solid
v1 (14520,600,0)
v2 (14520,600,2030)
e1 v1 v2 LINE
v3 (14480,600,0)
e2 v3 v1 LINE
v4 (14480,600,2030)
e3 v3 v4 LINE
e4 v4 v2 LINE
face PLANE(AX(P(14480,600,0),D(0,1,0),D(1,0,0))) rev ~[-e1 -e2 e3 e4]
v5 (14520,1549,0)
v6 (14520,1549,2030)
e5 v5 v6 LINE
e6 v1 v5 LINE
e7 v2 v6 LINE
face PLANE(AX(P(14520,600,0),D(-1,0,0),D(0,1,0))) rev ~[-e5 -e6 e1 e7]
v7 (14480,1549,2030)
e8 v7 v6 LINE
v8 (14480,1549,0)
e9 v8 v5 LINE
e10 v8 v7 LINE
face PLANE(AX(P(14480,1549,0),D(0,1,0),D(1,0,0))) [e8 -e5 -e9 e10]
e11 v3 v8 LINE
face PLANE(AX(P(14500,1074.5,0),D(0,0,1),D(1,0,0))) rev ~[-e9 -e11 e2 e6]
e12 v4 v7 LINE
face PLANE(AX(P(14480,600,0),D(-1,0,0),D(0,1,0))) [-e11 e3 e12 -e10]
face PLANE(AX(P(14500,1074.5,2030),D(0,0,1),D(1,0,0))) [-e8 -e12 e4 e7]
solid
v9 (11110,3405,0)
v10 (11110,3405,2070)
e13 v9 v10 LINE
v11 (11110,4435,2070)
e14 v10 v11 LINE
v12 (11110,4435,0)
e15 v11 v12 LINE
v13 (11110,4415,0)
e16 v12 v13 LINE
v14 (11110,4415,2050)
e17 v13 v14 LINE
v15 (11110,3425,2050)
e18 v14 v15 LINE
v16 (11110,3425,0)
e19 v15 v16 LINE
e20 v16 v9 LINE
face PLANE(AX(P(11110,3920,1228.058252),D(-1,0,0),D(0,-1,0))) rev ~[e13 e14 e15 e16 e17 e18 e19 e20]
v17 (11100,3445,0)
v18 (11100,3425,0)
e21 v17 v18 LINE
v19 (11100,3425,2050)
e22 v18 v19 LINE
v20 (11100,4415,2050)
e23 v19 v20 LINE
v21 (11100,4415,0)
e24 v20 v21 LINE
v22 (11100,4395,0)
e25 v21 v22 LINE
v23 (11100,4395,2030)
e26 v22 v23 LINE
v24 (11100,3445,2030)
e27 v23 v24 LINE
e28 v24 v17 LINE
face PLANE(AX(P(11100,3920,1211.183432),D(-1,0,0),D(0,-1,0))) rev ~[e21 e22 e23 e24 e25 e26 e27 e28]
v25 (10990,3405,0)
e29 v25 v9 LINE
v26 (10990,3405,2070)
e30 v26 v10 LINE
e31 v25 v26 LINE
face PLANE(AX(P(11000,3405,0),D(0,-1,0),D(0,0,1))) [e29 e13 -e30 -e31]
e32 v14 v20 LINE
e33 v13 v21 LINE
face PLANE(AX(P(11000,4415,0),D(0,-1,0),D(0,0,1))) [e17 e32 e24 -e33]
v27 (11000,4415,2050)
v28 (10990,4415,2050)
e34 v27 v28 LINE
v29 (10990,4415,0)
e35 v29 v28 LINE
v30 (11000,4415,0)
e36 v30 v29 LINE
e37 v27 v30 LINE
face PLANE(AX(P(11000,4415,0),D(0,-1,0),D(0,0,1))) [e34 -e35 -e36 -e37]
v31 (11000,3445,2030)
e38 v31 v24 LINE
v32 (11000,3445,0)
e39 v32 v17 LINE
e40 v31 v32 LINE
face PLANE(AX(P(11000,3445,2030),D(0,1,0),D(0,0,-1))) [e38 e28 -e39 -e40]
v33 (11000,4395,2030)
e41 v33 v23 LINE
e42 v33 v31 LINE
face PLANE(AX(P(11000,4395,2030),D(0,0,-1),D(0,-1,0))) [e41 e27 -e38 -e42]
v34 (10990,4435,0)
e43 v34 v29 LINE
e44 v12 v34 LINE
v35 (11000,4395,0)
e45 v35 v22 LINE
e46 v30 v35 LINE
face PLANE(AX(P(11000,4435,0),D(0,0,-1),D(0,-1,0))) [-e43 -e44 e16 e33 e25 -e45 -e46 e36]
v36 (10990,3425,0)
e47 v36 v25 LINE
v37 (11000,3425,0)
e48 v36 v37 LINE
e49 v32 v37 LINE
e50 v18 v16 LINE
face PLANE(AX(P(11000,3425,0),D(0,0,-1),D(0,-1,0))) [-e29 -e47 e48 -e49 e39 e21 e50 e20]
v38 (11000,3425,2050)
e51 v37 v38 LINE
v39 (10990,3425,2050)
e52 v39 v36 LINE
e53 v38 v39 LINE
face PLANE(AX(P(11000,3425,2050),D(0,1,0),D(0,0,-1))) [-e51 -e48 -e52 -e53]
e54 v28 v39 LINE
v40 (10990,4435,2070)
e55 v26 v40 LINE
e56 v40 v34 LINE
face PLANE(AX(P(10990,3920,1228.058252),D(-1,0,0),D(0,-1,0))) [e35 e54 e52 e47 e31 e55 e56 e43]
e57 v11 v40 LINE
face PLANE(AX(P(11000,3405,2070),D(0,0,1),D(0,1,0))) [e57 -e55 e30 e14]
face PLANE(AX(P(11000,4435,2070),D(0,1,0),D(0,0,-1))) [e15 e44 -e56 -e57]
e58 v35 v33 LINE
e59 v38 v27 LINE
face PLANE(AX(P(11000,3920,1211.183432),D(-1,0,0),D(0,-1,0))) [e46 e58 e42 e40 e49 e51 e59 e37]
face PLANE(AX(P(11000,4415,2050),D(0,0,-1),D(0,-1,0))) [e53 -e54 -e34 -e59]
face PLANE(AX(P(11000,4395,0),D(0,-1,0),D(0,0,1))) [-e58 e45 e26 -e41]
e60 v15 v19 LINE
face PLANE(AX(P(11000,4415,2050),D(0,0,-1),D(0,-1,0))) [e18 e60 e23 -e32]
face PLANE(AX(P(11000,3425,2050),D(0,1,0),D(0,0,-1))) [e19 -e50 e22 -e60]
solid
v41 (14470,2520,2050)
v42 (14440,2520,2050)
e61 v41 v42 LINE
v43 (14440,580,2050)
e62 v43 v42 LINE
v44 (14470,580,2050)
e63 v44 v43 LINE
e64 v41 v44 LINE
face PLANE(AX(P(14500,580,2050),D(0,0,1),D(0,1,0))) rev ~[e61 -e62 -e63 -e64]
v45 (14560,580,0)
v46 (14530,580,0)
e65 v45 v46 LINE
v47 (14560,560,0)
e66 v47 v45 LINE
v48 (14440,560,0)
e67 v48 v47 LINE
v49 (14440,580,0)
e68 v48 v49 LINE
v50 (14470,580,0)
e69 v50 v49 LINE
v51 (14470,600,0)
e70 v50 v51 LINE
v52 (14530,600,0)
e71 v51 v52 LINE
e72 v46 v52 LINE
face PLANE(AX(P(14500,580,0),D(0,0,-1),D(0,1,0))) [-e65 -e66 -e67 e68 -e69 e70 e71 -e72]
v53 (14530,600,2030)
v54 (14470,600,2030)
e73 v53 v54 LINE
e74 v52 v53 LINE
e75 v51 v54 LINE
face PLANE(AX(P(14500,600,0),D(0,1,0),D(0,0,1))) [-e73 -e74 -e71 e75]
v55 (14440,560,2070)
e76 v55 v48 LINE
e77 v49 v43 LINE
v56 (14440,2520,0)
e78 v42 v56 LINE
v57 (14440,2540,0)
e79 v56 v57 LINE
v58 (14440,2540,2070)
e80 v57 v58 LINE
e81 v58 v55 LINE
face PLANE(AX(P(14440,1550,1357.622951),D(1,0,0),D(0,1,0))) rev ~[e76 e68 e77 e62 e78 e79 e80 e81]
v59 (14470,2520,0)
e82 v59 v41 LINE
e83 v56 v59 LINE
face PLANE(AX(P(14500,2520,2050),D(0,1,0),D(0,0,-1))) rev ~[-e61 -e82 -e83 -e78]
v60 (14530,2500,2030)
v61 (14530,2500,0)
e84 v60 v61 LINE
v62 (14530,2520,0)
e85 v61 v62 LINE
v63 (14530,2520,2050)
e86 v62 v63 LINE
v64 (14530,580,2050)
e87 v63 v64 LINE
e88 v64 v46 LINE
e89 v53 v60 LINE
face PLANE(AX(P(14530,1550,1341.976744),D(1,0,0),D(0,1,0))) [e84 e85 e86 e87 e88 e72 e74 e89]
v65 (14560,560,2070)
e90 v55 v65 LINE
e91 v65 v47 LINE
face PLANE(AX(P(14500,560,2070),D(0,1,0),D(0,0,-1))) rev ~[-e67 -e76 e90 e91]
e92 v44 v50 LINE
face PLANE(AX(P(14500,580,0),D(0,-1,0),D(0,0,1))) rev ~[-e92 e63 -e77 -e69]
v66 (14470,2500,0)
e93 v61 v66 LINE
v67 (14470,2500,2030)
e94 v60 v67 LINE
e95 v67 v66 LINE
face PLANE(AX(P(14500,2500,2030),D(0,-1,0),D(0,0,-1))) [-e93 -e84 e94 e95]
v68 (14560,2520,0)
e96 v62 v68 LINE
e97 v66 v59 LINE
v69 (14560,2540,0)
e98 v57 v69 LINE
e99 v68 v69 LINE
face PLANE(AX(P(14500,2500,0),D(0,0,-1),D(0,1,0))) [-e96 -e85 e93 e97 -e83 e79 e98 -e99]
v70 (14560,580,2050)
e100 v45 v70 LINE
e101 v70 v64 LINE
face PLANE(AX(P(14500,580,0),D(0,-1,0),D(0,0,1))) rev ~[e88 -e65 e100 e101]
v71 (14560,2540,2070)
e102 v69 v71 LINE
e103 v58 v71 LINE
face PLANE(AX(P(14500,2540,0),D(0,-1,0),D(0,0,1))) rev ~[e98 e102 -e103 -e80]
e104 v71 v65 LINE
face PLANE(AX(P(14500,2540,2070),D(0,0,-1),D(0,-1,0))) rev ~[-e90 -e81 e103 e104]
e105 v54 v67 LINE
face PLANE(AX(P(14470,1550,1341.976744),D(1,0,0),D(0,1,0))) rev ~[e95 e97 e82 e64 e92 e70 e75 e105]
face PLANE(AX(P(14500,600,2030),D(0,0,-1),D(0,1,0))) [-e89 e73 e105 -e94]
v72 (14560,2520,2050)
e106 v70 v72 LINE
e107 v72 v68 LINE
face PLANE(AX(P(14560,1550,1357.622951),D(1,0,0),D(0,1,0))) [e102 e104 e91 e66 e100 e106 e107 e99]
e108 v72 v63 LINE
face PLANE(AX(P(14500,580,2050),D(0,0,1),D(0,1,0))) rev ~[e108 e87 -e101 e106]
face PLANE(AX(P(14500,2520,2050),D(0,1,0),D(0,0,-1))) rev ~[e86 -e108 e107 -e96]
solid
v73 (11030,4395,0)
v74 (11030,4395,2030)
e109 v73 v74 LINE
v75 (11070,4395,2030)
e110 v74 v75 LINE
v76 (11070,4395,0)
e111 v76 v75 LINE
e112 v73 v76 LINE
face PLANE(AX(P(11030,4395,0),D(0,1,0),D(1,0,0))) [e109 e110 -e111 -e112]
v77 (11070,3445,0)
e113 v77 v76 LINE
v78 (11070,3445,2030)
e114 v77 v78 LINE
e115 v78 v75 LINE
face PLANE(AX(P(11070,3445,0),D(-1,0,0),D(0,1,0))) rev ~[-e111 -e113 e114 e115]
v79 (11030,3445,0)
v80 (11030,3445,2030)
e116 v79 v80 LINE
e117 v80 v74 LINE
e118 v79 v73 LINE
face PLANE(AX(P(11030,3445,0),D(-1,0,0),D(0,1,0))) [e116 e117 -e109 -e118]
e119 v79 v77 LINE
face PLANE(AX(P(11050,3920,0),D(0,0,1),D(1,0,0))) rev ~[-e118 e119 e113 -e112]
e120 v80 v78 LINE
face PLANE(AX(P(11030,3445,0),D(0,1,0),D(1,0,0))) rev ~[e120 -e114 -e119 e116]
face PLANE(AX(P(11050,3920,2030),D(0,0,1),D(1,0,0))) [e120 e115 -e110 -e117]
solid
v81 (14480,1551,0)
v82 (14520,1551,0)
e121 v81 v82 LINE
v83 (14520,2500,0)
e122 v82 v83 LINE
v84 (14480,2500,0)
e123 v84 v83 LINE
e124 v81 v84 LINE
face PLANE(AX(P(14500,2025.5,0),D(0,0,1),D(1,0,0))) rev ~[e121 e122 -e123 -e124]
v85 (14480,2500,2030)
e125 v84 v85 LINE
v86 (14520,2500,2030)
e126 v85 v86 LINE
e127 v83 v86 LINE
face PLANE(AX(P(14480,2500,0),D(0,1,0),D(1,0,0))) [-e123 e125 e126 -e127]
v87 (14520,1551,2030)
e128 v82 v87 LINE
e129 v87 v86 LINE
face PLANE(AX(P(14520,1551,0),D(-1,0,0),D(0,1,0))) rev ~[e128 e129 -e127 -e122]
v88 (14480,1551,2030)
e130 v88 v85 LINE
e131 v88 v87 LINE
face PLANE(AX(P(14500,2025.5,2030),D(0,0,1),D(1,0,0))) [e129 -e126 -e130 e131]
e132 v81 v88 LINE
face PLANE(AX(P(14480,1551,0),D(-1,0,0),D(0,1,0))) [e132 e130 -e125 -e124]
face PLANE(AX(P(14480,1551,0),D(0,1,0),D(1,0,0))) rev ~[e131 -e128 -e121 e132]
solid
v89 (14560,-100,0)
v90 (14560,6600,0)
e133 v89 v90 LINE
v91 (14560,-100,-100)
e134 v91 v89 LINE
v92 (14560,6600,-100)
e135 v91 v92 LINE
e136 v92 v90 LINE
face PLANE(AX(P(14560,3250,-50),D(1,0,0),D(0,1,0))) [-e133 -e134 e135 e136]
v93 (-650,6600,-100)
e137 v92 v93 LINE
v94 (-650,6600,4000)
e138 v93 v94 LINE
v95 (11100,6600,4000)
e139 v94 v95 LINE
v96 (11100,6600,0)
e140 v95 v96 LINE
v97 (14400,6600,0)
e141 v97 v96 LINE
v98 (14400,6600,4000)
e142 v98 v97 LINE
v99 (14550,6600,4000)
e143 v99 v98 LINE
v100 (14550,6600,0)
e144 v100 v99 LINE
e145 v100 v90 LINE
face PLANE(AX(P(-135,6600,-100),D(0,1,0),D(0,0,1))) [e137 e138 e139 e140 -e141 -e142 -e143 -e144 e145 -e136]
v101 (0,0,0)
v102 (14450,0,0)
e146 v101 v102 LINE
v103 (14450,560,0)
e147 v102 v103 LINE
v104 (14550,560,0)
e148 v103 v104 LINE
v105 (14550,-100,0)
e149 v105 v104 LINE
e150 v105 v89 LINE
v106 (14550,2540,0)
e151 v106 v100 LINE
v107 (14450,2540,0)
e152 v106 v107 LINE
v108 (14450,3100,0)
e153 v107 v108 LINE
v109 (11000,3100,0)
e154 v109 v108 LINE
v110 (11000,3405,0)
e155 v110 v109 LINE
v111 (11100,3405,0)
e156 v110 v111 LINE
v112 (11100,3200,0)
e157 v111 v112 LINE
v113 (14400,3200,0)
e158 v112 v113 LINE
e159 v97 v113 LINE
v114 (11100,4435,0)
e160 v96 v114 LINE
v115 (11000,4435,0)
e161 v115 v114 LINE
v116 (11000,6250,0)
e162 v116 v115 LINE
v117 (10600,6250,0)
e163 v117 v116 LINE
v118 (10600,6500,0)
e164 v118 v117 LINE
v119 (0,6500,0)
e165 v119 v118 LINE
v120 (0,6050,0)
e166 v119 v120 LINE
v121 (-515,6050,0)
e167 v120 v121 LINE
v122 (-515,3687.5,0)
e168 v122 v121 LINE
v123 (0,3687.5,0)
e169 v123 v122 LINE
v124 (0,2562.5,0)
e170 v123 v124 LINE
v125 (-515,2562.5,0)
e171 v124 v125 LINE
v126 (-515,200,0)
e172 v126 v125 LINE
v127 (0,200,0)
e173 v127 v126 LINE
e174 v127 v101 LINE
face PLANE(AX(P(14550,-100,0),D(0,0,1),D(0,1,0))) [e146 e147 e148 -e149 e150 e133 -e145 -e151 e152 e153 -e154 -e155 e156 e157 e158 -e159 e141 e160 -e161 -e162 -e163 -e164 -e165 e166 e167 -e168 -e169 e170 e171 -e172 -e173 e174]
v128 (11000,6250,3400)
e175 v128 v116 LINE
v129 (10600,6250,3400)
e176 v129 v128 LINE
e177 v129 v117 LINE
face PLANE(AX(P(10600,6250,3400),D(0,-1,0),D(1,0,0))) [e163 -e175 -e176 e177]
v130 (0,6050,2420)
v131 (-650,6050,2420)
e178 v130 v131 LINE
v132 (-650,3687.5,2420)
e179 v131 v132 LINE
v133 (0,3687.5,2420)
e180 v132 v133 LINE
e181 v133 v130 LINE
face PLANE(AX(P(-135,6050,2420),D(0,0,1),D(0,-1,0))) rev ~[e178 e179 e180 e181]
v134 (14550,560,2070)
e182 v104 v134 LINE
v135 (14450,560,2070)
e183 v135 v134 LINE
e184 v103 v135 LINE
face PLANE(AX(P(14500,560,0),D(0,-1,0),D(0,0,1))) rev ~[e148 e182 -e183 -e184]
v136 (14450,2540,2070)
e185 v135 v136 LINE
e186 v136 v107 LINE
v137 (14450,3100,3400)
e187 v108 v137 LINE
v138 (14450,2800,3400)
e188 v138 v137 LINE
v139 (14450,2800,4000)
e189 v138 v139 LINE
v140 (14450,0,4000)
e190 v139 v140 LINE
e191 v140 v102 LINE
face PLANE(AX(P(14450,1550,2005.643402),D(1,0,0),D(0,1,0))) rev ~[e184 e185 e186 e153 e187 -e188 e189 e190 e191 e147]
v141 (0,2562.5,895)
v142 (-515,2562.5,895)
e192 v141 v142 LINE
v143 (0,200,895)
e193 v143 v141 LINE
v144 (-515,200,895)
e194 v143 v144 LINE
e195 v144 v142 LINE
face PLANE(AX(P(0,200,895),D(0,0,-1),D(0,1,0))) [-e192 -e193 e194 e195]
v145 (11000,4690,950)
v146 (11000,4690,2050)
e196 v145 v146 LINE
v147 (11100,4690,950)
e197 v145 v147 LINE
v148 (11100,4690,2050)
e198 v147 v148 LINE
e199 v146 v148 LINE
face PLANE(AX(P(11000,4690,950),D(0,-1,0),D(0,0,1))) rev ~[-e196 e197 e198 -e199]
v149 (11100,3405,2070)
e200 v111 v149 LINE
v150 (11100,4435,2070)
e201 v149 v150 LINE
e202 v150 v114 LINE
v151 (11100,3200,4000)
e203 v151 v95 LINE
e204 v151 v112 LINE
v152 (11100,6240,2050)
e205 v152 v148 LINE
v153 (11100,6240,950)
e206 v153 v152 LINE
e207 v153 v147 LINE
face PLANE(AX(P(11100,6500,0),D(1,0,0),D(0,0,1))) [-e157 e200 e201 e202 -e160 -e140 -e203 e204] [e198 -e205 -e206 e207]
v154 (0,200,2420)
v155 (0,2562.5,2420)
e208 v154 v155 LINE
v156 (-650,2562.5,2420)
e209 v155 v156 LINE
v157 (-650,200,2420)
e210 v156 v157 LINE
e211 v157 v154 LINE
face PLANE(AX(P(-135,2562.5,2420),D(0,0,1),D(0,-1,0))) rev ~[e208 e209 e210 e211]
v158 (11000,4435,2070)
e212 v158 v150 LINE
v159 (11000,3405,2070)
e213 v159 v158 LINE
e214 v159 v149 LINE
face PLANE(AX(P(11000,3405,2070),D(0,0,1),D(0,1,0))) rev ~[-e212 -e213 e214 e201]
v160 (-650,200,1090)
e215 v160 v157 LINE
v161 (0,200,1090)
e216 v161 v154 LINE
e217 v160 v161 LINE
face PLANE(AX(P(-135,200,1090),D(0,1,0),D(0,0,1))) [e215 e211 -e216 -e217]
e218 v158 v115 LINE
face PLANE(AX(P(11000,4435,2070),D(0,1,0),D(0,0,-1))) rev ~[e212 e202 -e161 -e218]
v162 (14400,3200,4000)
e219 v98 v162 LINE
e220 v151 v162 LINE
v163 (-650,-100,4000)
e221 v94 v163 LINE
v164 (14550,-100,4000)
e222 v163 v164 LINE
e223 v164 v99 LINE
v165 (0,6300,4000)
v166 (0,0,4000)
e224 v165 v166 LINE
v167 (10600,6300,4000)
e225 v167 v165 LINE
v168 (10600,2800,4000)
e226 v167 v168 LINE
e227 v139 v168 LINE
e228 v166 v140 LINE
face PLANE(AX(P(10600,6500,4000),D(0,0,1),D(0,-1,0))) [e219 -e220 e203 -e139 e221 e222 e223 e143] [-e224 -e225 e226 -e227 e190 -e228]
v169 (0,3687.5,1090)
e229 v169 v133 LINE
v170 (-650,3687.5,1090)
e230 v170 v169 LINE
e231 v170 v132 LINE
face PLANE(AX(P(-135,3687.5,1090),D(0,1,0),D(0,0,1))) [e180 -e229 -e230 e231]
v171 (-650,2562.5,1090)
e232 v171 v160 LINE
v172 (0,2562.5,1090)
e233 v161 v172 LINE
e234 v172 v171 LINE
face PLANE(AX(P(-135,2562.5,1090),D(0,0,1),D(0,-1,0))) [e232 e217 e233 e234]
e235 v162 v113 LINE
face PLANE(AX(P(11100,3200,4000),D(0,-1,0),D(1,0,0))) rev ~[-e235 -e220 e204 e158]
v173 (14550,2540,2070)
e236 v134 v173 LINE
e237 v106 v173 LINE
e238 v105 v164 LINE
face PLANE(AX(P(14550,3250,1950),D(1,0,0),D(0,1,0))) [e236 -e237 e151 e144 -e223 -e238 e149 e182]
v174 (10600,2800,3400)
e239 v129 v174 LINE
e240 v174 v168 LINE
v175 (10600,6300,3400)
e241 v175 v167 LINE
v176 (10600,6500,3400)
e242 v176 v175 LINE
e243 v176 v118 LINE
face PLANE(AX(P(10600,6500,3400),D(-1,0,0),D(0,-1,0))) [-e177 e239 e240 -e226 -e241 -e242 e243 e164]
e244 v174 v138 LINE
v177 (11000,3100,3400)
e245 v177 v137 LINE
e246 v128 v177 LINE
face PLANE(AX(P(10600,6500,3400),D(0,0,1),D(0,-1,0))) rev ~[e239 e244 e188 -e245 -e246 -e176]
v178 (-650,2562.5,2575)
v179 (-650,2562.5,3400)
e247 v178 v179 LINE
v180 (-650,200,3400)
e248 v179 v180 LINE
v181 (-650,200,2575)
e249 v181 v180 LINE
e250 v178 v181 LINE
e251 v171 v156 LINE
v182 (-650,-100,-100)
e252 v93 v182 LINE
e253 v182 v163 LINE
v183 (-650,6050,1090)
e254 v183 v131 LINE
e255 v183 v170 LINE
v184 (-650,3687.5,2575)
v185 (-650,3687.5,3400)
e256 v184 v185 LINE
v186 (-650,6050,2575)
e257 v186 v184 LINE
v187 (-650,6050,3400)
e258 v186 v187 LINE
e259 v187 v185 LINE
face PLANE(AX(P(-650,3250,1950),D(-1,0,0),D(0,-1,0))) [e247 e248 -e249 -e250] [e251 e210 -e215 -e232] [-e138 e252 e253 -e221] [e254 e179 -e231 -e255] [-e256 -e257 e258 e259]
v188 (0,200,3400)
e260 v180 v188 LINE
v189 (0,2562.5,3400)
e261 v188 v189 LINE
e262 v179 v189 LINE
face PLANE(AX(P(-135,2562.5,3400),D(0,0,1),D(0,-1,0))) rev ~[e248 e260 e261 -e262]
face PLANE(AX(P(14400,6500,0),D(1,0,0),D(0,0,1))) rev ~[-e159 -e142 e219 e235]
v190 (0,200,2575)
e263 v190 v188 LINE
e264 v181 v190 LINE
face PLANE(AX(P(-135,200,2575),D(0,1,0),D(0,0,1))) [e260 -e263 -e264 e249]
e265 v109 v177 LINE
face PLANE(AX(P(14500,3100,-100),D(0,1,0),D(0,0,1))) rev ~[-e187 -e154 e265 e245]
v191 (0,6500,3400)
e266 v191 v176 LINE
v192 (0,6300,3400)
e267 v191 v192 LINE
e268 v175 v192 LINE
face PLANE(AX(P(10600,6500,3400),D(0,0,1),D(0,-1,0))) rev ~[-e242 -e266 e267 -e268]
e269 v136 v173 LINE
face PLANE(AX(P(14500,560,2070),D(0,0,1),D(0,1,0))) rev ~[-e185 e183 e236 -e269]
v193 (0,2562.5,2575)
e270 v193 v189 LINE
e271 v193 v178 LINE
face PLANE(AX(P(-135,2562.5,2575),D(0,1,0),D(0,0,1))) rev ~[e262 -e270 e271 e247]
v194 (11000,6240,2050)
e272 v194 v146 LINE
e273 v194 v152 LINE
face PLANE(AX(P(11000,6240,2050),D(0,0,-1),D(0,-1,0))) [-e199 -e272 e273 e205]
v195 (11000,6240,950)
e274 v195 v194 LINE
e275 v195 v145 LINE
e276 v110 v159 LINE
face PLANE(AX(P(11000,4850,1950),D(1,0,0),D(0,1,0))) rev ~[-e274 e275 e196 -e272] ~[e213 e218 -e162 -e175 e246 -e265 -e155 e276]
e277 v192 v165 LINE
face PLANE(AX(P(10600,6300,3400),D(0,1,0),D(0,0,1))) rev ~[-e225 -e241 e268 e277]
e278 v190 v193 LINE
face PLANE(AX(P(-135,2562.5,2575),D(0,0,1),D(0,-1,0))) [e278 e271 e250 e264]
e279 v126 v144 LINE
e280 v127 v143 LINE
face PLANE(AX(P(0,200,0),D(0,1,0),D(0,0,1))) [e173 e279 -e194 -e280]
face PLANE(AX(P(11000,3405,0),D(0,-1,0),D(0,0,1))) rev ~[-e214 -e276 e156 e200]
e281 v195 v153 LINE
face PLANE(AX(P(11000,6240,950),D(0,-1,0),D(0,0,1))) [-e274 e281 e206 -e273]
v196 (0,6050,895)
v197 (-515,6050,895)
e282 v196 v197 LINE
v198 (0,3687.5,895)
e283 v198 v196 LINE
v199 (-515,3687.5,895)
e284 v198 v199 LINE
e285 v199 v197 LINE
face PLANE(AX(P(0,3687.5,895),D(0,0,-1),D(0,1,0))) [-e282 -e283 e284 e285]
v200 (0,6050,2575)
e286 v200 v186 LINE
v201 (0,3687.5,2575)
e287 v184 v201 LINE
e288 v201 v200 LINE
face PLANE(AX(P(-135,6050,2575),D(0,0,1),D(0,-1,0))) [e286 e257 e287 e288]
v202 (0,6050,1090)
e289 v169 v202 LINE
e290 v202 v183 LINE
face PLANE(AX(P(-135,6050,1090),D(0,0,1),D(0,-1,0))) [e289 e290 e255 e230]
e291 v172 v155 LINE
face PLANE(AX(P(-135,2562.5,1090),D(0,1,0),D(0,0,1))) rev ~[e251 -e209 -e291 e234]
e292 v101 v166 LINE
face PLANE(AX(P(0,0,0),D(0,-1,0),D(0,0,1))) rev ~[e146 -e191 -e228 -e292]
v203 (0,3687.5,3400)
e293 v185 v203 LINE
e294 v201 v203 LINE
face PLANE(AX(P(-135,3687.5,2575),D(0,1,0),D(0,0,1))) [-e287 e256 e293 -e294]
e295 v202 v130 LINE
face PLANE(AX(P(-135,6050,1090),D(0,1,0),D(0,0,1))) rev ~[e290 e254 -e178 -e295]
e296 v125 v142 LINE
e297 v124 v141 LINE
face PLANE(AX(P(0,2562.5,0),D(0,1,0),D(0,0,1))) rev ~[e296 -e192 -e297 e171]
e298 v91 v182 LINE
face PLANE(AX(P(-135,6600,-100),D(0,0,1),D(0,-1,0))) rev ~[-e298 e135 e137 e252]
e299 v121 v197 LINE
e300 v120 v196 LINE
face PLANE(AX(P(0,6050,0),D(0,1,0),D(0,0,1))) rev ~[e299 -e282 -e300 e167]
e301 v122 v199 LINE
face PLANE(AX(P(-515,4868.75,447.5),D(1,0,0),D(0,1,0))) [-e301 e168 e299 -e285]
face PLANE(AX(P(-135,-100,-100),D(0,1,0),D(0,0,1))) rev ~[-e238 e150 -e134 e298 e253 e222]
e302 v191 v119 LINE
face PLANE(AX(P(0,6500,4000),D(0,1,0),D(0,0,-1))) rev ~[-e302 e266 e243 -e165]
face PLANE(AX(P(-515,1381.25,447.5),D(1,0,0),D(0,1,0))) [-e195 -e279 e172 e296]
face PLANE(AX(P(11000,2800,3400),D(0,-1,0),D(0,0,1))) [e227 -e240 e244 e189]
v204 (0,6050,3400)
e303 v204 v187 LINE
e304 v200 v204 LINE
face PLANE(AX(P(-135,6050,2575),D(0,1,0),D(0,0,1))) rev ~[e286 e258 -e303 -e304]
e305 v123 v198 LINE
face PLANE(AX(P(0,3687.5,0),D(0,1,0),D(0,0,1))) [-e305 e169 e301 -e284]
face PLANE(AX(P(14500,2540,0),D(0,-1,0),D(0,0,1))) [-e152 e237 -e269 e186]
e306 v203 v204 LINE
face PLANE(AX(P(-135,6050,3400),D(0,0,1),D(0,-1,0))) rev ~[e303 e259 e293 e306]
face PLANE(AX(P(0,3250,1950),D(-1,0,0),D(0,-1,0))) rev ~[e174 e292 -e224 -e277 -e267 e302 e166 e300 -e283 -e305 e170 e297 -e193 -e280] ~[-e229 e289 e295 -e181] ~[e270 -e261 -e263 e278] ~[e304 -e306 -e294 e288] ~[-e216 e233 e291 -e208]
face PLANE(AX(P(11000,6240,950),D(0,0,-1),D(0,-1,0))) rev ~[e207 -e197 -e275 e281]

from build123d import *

# Parameters (mm, degrees)
F1_DEPTH       = 14500
F2_W           = 6700
F2_H           = 4100
F3_DEPTH       = 100
F4_W           = 3500
F4_H           = 4100
F5_DEPTH       = 3500
F6_W           = 3300
F6_H           = 3300
F7_DEPTH       = 4000
F8_W           = 3300
F8_H           = 4000
F9_DEPTH       = 300
F11_DEPTH      = 60
F11_DEPTH_BACK = 60
F13_DEPTH      = 30
F13_DEPTH_BACK = 30
F16_DEPTH      = 50
F17_W          = 6700
F17_H          = 4100
F17_W_2        = 1980
F17_H_2        = 2070
F18_DEPTH      = 50
F18_DEPTH_BACK = 50
F20_DEPTH      = 100
F21_W          = 40
F21_H          = 949
F22_DEPTH      = 2030
F23_W          = 6700
F23_H          = 100
F24_DEPTH      = 10
F26_DEPTH      = 10
F26_DEPTH_BACK = 110
F28_DEPTH      = 100
F29_W          = 40
F29_H          = 950
F30_DEPTH      = 2030
F31_W          = 2362.5
F31_H          = 1330
F32_DEPTH      = 100
F33_W          = 2362.5
F33_H          = 825
F34_DEPTH      = 100
F35_W          = 6700
F35_H          = 4100
F35_W_2        = 2362.5
F35_H_2        = 1330
F35_H_3        = 825
F36_DEPTH      = 35
F37_W          = 6700
F37_H          = 4100
F37_W_2        = 2362.5
F37_H_2        = 1330
F37_H_3        = 825
F38_DEPTH      = 515
F39_W          = 2362.5
F39_H          = 895
F40_DEPTH      = 515
F41_W          = 400
F41_H          = 600
F42_DEPTH      = 3700
F43_W          = 300
F43_H          = 600
F44_DEPTH      = 3450
F45_W          = 200
F45_H          = 600
F46_DEPTH      = 10600
F47_W          = 400
F47_H          = 250
F48_DEPTH      = 3400
F49_W          = 1550
F49_H          = 1100
F50_DEPTH      = 100


with BuildPart() as f1:
    # F0 (on Right) → F1 (new body)
    with BuildSketch(Plane.YZ):
        Polygon((6500, 0), (0, 0), (0, 4000), (-100, 4000), (-100, -100), (6600, -100), (6600, 4000), (6500, 4000), align=None)
    extrude(amount=F1_DEPTH)

    # F2 (on face) → F3 (join)
    with BuildSketch(Plane(origin=(0, 0, 0), x_dir=(0, -1, 0), z_dir=(-1, 0, 0))):
        with Locations((-3250, 1950)):
            Rectangle(F2_W, F2_H)
    extrude(amount=F3_DEPTH)

    # F4 (on face) → F5 (join)
    with BuildSketch(Plane.YZ.offset(14500)):
        with Locations((4850, 1950)):
            Rectangle(F4_W, F4_H)
    extrude(amount=-F5_DEPTH)

    # F6 (on face) → F7 (cut)
    with BuildSketch(Plane.XY.offset(4000)):
        with Locations((12750, 4850)):
            Rectangle(F6_W, F6_H)
    extrude(amount=-F7_DEPTH, mode=Mode.SUBTRACT)

    # F8 (on face) → F9 (cut)
    with BuildSketch(Plane.XZ.offset(-6500)):
        with Locations((12750, 2000)):
            Rectangle(F8_W, F8_H)
    extrude(amount=-F9_DEPTH, mode=Mode.SUBTRACT)

    # F15 (on face) → F16 (join)
    with BuildSketch(Plane.YZ.offset(14500)):
        Polygon((0, 4000), (0, 0), (560, 0), (560, 2070), (2540, 2070), (2540, 0), (3100, 0), (3100, 4000), align=None)
    extrude(amount=-F16_DEPTH)

    # F17 (on face) → F18 (join, two sides)
    with BuildSketch(Plane.YZ.offset(14500)) as f18_sk:
        with Locations((3250, 1950)):
            Rectangle(F17_W, F17_H)
        with Locations((1550, 1035)):
            Rectangle(F17_W_2, F17_H_2, mode=Mode.SUBTRACT)
    extrude(amount=F18_DEPTH)
    extrude(f18_sk.sketch, amount=-F18_DEPTH_BACK)

    # F19 (on face) → F20 (cut, through all)
    with BuildSketch(Plane(origin=(11000, 0, 0), x_dir=(0, -1, 0), z_dir=(-1, 0, 0))):
        Polygon((-3545, 0), (-3405, 0), (-3405, 2070), (-3445, 2070), (-4395, 2070), (-4435, 2070), (-4435, 0), align=None)
    extrude(amount=-F20_DEPTH, mode=Mode.SUBTRACT)

    # F23 (on face) → F24 (join, through all)
    with BuildSketch(Plane.YZ.offset(14550)):
        with Locations((3250, -50)):
            Rectangle(F23_W, F23_H)
    extrude(amount=F24_DEPTH)

    # F31 (on face) → F32 (cut, through all)
    with BuildSketch(Plane.YZ):
        with Locations((1381.25, 1755)):
            Rectangle(F31_W, F31_H)
        with Locations((4868.75, 1755)):
            Rectangle(F31_W, F31_H)
    extrude(amount=-F32_DEPTH, mode=Mode.SUBTRACT)

    # F33 (on face) → F34 (cut, through all)
    with BuildSketch(Plane.YZ):
        with Locations((1381.25, 2987.5)):
            Rectangle(F33_W, F33_H)
        with Locations((4868.75, 2987.5)):
            Rectangle(F33_W, F33_H)
    extrude(amount=-F34_DEPTH, mode=Mode.SUBTRACT)

    # F35 (on face) → F36 (join)
    with BuildSketch(Plane(origin=(-100, 0, 0), x_dir=(0, -1, 0), z_dir=(-1, 0, 0))):
        with Locations((-3250, 1950)):
            Rectangle(F35_W, F35_H)
        with Locations((-4868.75, 1755)):
            Rectangle(F35_W_2, F35_H_2, mode=Mode.SUBTRACT)
        with Locations((-1381.25, 1755)):
            Rectangle(F35_W_2, F35_H_2, mode=Mode.SUBTRACT)
        with Locations((-4868.75, 2987.5)):
            Rectangle(F35_W_2, F35_H_3, mode=Mode.SUBTRACT)
        with Locations((-1381.25, 2987.5)):
            Rectangle(F35_W_2, F35_H_3, mode=Mode.SUBTRACT)
    extrude(amount=F36_DEPTH)

    # F37 (on face) → F38 (join)
    with BuildSketch(Plane(origin=(-135, 0, 0), x_dir=(0, -1, 0), z_dir=(-1, 0, 0))):
        with Locations((-3250, 1950)):
            Rectangle(F37_W, F37_H)
        with Locations((-4868.75, 1755)):
            Rectangle(F37_W_2, F37_H_2, mode=Mode.SUBTRACT)
        with Locations((-1381.25, 1755)):
            Rectangle(F37_W_2, F37_H_2, mode=Mode.SUBTRACT)
        with Locations((-4868.75, 2987.5)):
            Rectangle(F37_W_2, F37_H_3, mode=Mode.SUBTRACT)
        with Locations((-1381.25, 2987.5)):
            Rectangle(F37_W_2, F37_H_3, mode=Mode.SUBTRACT)
    extrude(amount=F38_DEPTH)

    # F39 (on face) → F40 (cut)
    with BuildSketch(Plane.YZ):
        with Locations((1381.25, 447.5)):
            Rectangle(F39_W, F39_H)
        with Locations((4868.75, 447.5)):
            Rectangle(F39_W, F39_H)
    extrude(amount=-F40_DEPTH, mode=Mode.SUBTRACT)

    # F41 (on face) → F42 (join)
    with BuildSketch(Plane.XZ.offset(-6500)):
        with Locations((10800, 3700)):
            Rectangle(F41_W, F41_H)
    extrude(amount=F42_DEPTH)

    # F43 (on face) → F44 (join, through all)
    with BuildSketch(Plane.YZ.offset(11000)):
        with Locations((2950, 3700)):
            Rectangle(F43_W, F43_H)
    extrude(amount=F44_DEPTH)

    # F45 (on face) → F46 (join, through all)
    with BuildSketch(Plane(origin=(10600, 0, 0), x_dir=(0, -1, 0), z_dir=(-1, 0, 0))):
        with Locations((-6400, 3700)):
            Rectangle(F45_W, F45_H)
    extrude(amount=F46_DEPTH)

    # F47 (on face) → F48 (join, through all)
    with BuildSketch(Plane(origin=(0, 0, 3400), x_dir=(1, 0, 0), z_dir=(0, 0, -1))):
        with Locations((10800, -6375)):
            Rectangle(F47_W, F47_H)
    extrude(amount=F48_DEPTH)

    # F49 (on face) → F50 (cut, through all)
    with BuildSketch(Plane(origin=(11000, 0, 0), x_dir=(0, -1, 0), z_dir=(-1, 0, 0))):
        with Locations((-5465, 1500)):
            Rectangle(F49_W, F49_H)
    extrude(amount=-F50_DEPTH, mode=Mode.SUBTRACT)


with BuildPart() as f11:
    # F10 (on face) → F11 (new body, two sides)
    with BuildSketch(Plane.YZ.offset(14500)) as f11_sk:
        Polygon((2520, 2050), (2520, 0), (2540, 0), (2540, 2020), (2540, 2070), (1550, 2070), (560, 2070), (560, 2020), (560, 0), (580, 0), (580, 2050), align=None)
    extrude(amount=-F11_DEPTH)
    extrude(f11_sk.sketch, amount=F11_DEPTH_BACK)

    # F12 (on face) → F13 (join, two sides)
    with BuildSketch(Plane.YZ.offset(14500)) as f13_sk:
        Polygon((2500, 0), (2520, 0), (2520, 2050), (580, 2050), (580, 0), (600, 0), (600, 2030), (2500, 2030), align=None)
    extrude(amount=F13_DEPTH)
    extrude(f13_sk.sketch, amount=-F13_DEPTH_BACK)


with BuildPart() as f22:
    # F21 (on face) → F22 (new body, through all)
    with BuildSketch(Plane.XY):
        with Locations((14500, 2025.5)):
            Rectangle(F21_W, F21_H)
    extrude(amount=F22_DEPTH)


with BuildPart() as f22b:
    # F21 (on face) → F22, piece 2 (new body, through all)
    with BuildSketch(Plane.XY):
        with Locations((14500, 1074.5)):
            Rectangle(F21_W, F21_H)
    extrude(amount=F22_DEPTH)


with BuildPart() as f26:
    # F25 (on face) → F26 (new body, two sides)
    with BuildSketch(Plane(origin=(11000, 0, 0), x_dir=(0, -1, 0), z_dir=(-1, 0, 0))) as f26_sk:
        Polygon((-3405, 2070), (-4435, 2070), (-4435, 0), (-4415, 0), (-4415, 2050), (-3425, 2050), (-3425, 0), (-3405, 0), align=None)
    extrude(amount=F26_DEPTH)
    extrude(f26_sk.sketch, amount=-F26_DEPTH_BACK)

    # F27 (on face) → F28 (join)
    with BuildSketch(Plane(origin=(11000, 0, 0), x_dir=(0, -1, 0), z_dir=(-1, 0, 0))):
        Polygon((-4415, 2050), (-4415, 0), (-4395, 0), (-4395, 2030), (-3445, 2030), (-3445, 0), (-3425, 0), (-3425, 2050), align=None)
    extrude(amount=-F28_DEPTH)


with BuildPart() as f30:
    # F29 (on face) → F30 (new body, through all)
    with BuildSketch(Plane.XY):
        with Locations((11050, 3920)):
            Rectangle(F29_W, F29_H)
    extrude(amount=F30_DEPTH)


solid = Compound([f1.part, f11.part, f22.part, f22b.part, f26.part, f30.part])
